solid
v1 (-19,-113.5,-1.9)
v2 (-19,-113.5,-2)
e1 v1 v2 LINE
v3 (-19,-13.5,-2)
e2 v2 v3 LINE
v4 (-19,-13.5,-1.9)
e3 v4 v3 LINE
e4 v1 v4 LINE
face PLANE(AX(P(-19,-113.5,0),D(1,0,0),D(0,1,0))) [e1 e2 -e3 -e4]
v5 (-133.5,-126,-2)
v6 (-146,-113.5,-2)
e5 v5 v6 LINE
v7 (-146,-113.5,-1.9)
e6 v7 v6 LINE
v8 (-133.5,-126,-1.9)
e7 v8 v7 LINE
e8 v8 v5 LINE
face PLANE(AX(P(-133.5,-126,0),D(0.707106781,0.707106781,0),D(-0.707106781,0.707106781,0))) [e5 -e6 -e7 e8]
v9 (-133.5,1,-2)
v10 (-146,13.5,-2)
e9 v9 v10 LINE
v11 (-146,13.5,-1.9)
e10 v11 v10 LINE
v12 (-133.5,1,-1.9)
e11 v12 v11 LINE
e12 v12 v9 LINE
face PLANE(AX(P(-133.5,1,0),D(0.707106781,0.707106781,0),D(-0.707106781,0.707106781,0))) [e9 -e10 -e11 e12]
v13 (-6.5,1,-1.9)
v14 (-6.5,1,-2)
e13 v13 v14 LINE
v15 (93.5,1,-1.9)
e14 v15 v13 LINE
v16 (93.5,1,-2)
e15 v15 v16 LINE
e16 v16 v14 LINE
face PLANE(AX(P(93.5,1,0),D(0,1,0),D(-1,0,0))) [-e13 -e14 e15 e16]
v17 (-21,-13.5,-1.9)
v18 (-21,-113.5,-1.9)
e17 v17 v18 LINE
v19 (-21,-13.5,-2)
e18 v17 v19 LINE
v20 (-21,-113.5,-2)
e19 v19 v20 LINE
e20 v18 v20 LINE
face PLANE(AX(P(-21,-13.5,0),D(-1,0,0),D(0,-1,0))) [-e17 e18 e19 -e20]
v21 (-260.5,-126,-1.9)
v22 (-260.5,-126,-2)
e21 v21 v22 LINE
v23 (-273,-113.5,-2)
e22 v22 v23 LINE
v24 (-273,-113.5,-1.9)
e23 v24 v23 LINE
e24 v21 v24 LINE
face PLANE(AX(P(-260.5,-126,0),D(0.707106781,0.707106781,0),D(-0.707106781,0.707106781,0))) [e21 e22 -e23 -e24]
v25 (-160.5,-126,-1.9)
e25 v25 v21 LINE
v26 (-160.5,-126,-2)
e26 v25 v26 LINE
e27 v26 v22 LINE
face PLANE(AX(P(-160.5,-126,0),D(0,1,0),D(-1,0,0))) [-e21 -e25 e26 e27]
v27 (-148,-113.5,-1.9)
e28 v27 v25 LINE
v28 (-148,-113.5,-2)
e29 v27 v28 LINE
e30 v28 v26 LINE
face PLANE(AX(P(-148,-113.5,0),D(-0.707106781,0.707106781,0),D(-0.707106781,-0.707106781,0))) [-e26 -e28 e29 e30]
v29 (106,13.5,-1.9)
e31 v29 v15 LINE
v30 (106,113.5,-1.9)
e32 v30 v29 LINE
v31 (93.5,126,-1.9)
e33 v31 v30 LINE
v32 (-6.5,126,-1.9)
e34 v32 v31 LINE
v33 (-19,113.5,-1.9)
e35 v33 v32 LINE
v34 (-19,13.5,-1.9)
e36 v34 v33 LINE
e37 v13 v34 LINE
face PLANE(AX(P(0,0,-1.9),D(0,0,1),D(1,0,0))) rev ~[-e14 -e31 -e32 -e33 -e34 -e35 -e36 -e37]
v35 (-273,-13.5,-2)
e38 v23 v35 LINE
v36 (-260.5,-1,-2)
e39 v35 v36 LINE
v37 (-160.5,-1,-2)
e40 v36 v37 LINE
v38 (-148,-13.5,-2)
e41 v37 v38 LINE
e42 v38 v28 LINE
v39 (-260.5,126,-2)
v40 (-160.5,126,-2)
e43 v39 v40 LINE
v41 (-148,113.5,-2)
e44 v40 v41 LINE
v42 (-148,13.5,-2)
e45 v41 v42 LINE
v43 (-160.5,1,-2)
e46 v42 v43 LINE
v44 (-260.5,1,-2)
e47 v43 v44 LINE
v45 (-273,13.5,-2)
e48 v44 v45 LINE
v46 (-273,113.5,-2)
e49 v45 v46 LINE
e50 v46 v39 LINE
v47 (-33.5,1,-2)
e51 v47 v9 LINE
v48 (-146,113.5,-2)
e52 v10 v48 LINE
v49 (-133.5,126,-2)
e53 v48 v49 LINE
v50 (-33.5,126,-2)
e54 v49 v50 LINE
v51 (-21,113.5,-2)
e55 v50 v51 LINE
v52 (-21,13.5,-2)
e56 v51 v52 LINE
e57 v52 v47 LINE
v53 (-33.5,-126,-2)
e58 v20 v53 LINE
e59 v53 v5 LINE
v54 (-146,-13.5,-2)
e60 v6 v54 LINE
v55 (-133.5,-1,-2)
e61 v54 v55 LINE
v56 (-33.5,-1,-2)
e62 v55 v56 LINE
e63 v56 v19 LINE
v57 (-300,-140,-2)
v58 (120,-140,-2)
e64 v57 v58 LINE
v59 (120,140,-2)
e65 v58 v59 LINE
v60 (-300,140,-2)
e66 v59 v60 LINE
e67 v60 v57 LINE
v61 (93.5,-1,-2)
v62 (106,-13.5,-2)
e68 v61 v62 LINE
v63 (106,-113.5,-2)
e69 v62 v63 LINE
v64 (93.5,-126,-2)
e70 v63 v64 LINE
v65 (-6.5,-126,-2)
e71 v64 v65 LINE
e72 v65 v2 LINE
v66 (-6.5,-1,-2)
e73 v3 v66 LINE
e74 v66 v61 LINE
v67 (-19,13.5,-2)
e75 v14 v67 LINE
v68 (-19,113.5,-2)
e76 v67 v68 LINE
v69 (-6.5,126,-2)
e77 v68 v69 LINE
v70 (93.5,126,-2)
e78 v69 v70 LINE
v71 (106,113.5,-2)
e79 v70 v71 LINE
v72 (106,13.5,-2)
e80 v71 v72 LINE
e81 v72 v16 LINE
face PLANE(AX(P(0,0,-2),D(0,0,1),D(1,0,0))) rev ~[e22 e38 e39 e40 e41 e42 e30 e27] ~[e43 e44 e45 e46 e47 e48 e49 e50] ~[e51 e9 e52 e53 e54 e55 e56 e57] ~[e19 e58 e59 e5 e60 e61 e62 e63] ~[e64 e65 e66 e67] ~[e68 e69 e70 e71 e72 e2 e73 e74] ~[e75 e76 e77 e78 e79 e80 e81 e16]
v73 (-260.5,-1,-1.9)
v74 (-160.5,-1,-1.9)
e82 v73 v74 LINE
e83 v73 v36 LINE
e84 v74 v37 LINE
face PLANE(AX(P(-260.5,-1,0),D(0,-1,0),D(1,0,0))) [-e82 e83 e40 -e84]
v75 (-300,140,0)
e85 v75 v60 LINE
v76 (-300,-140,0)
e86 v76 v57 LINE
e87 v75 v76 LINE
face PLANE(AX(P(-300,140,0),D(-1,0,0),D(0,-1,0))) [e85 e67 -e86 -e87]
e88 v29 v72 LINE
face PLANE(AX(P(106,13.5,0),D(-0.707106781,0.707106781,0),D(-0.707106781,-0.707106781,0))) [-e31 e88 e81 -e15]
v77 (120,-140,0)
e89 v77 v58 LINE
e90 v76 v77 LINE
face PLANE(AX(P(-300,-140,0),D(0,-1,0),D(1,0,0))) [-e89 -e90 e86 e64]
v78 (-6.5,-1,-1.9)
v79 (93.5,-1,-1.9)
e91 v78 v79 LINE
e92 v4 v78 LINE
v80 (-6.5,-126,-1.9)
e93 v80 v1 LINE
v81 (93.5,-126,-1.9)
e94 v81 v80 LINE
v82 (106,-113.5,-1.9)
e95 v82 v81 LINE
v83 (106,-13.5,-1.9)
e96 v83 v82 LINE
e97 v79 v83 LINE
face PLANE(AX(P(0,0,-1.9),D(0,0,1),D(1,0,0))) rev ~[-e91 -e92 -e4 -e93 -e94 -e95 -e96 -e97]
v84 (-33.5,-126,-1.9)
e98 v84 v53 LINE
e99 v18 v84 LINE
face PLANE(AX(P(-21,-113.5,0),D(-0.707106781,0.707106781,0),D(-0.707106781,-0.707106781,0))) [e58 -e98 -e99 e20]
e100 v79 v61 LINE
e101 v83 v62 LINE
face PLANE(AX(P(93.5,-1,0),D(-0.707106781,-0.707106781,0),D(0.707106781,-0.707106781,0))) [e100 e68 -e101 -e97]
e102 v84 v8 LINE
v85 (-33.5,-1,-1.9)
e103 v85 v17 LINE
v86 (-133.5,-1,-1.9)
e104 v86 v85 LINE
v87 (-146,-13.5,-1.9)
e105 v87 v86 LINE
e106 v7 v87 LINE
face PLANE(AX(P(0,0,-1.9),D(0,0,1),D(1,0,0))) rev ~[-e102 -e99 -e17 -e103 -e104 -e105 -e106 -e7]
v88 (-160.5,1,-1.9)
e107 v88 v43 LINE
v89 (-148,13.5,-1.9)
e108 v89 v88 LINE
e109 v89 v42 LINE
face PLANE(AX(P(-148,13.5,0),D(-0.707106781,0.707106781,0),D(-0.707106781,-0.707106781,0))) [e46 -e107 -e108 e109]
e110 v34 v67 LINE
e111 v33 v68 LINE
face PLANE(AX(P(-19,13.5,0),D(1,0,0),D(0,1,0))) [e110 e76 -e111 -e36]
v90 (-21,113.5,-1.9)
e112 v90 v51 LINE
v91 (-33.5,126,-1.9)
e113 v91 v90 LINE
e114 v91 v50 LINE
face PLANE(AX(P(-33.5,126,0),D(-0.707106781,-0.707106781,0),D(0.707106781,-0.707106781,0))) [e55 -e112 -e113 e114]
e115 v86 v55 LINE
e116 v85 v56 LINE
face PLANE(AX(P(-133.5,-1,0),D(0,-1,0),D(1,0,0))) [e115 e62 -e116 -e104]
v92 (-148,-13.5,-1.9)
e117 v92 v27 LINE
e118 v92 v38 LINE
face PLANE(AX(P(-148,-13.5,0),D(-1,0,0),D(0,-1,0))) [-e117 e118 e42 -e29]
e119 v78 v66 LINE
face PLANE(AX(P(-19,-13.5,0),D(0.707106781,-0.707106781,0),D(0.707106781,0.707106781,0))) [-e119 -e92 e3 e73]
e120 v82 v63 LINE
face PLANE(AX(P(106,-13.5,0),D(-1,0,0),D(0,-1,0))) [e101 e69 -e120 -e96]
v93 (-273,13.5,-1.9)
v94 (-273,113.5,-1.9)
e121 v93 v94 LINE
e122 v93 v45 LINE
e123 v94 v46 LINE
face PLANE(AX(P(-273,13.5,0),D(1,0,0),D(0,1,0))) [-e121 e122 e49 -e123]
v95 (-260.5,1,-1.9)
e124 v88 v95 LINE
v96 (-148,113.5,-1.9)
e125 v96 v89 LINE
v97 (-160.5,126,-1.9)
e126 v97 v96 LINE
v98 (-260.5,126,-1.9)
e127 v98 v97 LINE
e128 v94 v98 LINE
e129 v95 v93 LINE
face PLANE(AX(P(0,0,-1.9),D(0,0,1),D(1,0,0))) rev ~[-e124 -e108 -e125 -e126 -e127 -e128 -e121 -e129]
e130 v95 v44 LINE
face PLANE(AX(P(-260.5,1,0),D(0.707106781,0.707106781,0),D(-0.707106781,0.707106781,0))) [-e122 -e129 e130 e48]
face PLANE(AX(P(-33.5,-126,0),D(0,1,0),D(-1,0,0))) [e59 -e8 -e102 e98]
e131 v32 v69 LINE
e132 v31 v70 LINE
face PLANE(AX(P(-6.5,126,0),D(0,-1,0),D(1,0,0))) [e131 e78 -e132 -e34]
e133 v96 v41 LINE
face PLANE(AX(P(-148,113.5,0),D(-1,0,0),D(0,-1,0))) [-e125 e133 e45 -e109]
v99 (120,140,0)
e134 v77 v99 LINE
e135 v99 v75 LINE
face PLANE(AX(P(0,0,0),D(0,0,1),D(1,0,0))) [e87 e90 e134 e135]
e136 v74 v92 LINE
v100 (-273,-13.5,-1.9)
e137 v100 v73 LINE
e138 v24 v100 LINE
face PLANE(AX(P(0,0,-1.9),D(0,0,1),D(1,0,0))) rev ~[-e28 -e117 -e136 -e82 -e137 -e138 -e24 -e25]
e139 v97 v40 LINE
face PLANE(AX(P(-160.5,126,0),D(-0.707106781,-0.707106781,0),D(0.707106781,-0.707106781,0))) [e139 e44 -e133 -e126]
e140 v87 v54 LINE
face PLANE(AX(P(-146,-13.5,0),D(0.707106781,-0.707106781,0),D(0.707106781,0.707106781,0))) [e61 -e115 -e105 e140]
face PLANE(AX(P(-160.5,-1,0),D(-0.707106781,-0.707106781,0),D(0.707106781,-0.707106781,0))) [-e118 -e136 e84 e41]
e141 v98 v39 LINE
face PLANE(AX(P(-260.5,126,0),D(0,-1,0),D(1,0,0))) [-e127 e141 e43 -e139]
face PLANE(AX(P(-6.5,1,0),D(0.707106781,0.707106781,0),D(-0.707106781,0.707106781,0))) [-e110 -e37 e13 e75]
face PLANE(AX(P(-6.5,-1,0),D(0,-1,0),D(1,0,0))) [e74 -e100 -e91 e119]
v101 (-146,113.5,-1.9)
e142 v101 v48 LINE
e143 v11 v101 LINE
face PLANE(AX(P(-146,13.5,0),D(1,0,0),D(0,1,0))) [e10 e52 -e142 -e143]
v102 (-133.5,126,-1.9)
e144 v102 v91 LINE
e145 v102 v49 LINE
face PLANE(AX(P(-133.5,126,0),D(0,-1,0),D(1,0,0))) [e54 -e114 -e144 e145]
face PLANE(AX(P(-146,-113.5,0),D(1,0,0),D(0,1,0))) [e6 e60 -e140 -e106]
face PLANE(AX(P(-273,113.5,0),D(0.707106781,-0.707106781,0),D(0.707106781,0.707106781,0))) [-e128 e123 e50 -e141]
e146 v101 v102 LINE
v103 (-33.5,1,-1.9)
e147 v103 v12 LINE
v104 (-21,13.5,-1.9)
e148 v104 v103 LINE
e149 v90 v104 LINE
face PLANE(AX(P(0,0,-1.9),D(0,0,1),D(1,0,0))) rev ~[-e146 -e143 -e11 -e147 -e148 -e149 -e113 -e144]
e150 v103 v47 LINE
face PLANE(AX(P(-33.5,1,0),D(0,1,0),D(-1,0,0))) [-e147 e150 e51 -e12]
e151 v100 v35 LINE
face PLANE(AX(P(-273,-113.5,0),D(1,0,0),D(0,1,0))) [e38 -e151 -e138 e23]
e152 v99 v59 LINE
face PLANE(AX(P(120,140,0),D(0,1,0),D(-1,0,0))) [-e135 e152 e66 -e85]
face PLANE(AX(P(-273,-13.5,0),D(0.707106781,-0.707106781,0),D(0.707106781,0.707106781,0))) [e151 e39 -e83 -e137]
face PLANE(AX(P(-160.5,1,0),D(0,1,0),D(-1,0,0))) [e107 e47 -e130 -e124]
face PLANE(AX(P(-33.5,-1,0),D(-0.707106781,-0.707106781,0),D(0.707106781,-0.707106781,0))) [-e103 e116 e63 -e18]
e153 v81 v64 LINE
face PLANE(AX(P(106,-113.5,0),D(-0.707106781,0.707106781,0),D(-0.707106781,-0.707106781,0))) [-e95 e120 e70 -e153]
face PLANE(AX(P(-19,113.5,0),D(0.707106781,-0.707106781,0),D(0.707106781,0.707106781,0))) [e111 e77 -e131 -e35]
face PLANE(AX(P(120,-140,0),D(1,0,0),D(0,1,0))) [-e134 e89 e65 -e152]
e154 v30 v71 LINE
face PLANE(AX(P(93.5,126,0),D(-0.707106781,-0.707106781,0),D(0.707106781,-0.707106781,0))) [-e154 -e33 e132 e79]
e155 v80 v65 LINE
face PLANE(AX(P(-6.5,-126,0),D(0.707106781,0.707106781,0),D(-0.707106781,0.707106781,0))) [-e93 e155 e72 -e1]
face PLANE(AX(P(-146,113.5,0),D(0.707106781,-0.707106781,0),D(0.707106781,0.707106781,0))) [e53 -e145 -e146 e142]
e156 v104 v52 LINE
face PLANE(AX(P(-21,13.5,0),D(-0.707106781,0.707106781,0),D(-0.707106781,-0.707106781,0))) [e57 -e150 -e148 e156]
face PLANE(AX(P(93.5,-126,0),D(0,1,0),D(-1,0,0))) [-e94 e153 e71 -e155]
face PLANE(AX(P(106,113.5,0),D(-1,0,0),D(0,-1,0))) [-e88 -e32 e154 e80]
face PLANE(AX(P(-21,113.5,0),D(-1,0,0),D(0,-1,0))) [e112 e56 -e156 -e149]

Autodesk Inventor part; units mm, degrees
ref_plane "YZ Plane" through (0, 0, 0) normal (1, 0, 0) x (0, 1, 0)
ref_plane "XZ Plane" through (0, 0, 0) normal (0, 1, 0) x (-1, 0, 0)
ref_plane "XY Plane" through (0, 0, 0) normal (0, 0, 1) x (1, 0, 0)
sketch "Sketch1" plane through (0, 0, 0) normal (0, 0, 1) x (1, 0, 0)
  line L0 (-300, -140) -> (120, -140)
  line L1 (120, -140) -> (120, 140)
  line L2 (120, 140) -> (-300, 140)
  line L3 (-300, 140) -> (-300, -140)
  point P0 (0, 0)
  dimension "d0" = 420
  dimension "d1" = 280
  dimension "d36" = 300
sketch "Sketch4" plane through (0, 0, 0) normal (0, 0, 1) x (1, 0, 0)
  line L0 (-273, -1) -> (-260.5, -1)
  line L1 (-148, -1) -> (-148, -13.5)
  line L2 (-148, -126) -> (-160.5, -126)
  line L3 (-273, -126) -> (-273, -113.5)
  line L4 (-273, -13.5) -> (-260.5, -1)
  line L5 (-160.5, -1) -> (-148, -13.5)
  line L6 (-148, -113.5) -> (-160.5, -126)
  line L7 (-260.5, -126) -> (-273, -113.5)
  line L8 (-260.5, -1) -> (-160.5, -1)
  line L9 (-273, -13.5) -> (-273, -1)
  line L10 (-160.5, -1) -> (-148, -1)
  line L11 (-148, -13.5) -> (-148, -113.5)
  line L12 (-160.5, -126) -> (-260.5, -126)
  line L13 (-148, -113.5) -> (-148, -126)
  line L14 (-260.5, -126) -> (-273, -126)
  line L15 (-273, -113.5) -> (-273, -13.5)
  line L16 (-300, -140) -> (120, -140) projected
  line L17 (-300, 140) -> (-300, -140) projected
  point P0 (0, 0)
  dimension "d6" = 125
  dimension "d7" = 125
  dimension "d8" = 12.5
  dimension "d9" = 12.5
  dimension "d10" = 12.5
  dimension "d11" = 12.5
  dimension "d12" = 12.5
  dimension "d13" = 12.5
  dimension "d14" = 12.5
  dimension "d15" = 12.5
  dimension "d22" = 14
  dimension "d23" = 27
sketch "Sketch5" plane through (0, 0, 0) normal (0, 0, 1) x (1, 0, 0)
  line L0 (-273, -13.5) -> (-260.5, -1) projected
  line L1 (-260.5, -1) -> (-160.5, -1) projected
  line L2 (-160.5, -1) -> (-148, -13.5) projected
  line L3 (-148, -13.5) -> (-148, -113.5) projected
  line L4 (-160.5, -126) -> (-260.5, -126) projected
  line L5 (-148, -113.5) -> (-160.5, -126) projected
  line L6 (-260.5, -126) -> (-273, -113.5) projected
  line L7 (-273, -113.5) -> (-273, -13.5) projected
  point P0 (0, 0)
boundary_patch "Boundary Patch3"
pattern_linear "Rectangular Pattern1" count 3 spacing 127 along (1, 0, 0) count 2 spacing 127 along (0, 1, 0) of "Boundary Patch3"
sketch "Sketch6" plane through (0, 0, 0) normal (0, 0, 1) x (1, 0, 0)
  line L0 (120, 140) -> (-300, 140) projected
  line L1 (-300, 140) -> (-300, -140) projected
  line L2 (-300, -140) -> (120, -140) projected
  line L3 (120, -140) -> (120, 140) projected
  line L4 (-260.5, 126) -> (-160.5, 126) projected
  line L5 (-133.5, 126) -> (-33.5, 126) projected
  line L6 (-146, 113.5) -> (-133.5, 126) projected
  line L7 (-160.5, 126) -> (-148, 113.5) projected
  line L8 (-273, 13.5) -> (-273, 113.5) projected
  line L9 (-273, 113.5) -> (-260.5, 126) projected
  line L10 (-260.5, 1) -> (-273, 13.5) projected
  line L11 (-160.5, 1) -> (-260.5, 1) projected
  line L12 (-148, 113.5) -> (-148, 13.5) projected
  line L13 (-148, 13.5) -> (-160.5, 1) projected
  line L14 (-133.5, 1) -> (-146, 13.5) projected
  line L15 (-146, 13.5) -> (-146, 113.5) projected
  line L16 (-21, 113.5) -> (-21, 13.5) projected
  line L17 (-19, 13.5) -> (-19, 113.5) projected
  line L18 (-33.5, 126) -> (-21, 113.5) projected
  line L19 (-19, 113.5) -> (-6.5, 126) projected
  line L20 (-6.5, 126) -> (93.5, 126) projected
  line L21 (93.5, 126) -> (106, 113.5) projected
  line L22 (106, 113.5) -> (106, 13.5) projected
  line L23 (-273, -113.5) -> (-273, -13.5) projected
  line L24 (-273, -13.5) -> (-260.5, -1) projected
  line L25 (-160.5, -1) -> (-148, -13.5) projected
  line L26 (-260.5, -1) -> (-160.5, -1) projected
  line L27 (-146, -13.5) -> (-133.5, -1) projected
  line L28 (-33.5, -1) -> (-21, -13.5) projected
  line L29 (-133.5, -1) -> (-33.5, -1) projected
  line L30 (-33.5, 1) -> (-133.5, 1) projected
  line L31 (-21, 13.5) -> (-33.5, 1) projected
  line L32 (106, 13.5) -> (93.5, 1) projected
  line L33 (-6.5, 1) -> (-19, 13.5) projected
  line L34 (93.5, 1) -> (-6.5, 1) projected
  line L35 (-6.5, -1) -> (93.5, -1) projected
  line L36 (-19, -13.5) -> (-6.5, -1) projected
  line L37 (93.5, -1) -> (106, -13.5) projected
  line L38 (-160.5, -126) -> (-260.5, -126) projected
  line L39 (-148, -13.5) -> (-148, -113.5) projected
  line L40 (-146, -113.5) -> (-146, -13.5) projected
  line L41 (-21, -13.5) -> (-21, -113.5) projected
  line L42 (-19, -113.5) -> (-19, -13.5) projected
  line L43 (106, -13.5) -> (106, -113.5) projected
  line L44 (106, -113.5) -> (93.5, -126) projected
  line L45 (93.5, -126) -> (-6.5, -126) projected
  line L46 (-6.5, -126) -> (-19, -113.5) projected
  line L47 (-21, -113.5) -> (-33.5, -126) projected
  line L48 (-33.5, -126) -> (-133.5, -126) projected
  line L49 (-133.5, -126) -> (-146, -113.5) projected
  line L50 (-148, -113.5) -> (-160.5, -126) projected
  line L51 (-260.5, -126) -> (-273, -113.5) projected
  point P0 (0, 0)
sketch "Sketch9" plane through (0, 0, 0) normal (0, 0, 1) x (1, 0, 0)
  line L0 (-260.5, 126) -> (-160.5, 126) projected
  line L1 (-160.5, 126) -> (-148, 113.5) projected
  line L2 (-148, 113.5) -> (-148, 13.5) projected
  line L3 (-273, 13.5) -> (-273, 113.5) projected
  line L4 (-273, 113.5) -> (-260.5, 126) projected
  line L5 (-160.5, 1) -> (-260.5, 1) projected
  line L6 (-260.5, 1) -> (-273, 13.5) projected
  line L7 (-273, -13.5) -> (-260.5, -1) projected
  line L8 (-260.5, -1) -> (-160.5, -1) projected
  line L9 (-273, -113.5) -> (-273, -13.5) projected
  line L10 (-160.5, -1) -> (-148, -13.5) projected
  line L11 (-148, -13.5) -> (-148, -113.5) projected
  line L12 (-148, 13.5) -> (-160.5, 1) projected
  line L13 (-133.5, 1) -> (-146, 13.5) projected
  line L14 (-146, -13.5) -> (-133.5, -1) projected
  line L15 (-146, -113.5) -> (-146, -13.5) projected
  line L16 (-146, 13.5) -> (-146, 113.5) projected
  line L17 (-133.5, 126) -> (-33.5, 126) projected
  line L18 (-146, 113.5) -> (-133.5, 126) projected
  line L19 (-33.5, 126) -> (-21, 113.5) projected
  line L20 (-21, 113.5) -> (-21, 13.5) projected
  line L21 (-21, 13.5) -> (-33.5, 1) projected
  line L22 (-33.5, 1) -> (-133.5, 1) projected
  line L23 (-133.5, -1) -> (-33.5, -1) projected
  line L24 (-33.5, -126) -> (-133.5, -126) projected
  line L25 (-160.5, -126) -> (-260.5, -126) projected
  line L26 (-260.5, -126) -> (-273, -113.5) projected
  line L27 (-148, -113.5) -> (-160.5, -126) projected
  line L28 (-21, -113.5) -> (-33.5, -126) projected
  line L29 (-133.5, -126) -> (-146, -113.5) projected
  line L30 (-33.5, -1) -> (-21, -13.5) projected
  line L31 (-6.5, 1) -> (-19, 13.5) projected
  line L32 (106, 13.5) -> (93.5, 1) projected
  line L33 (93.5, -1) -> (106, -13.5) projected
  line L34 (106, 113.5) -> (106, 13.5) projected
  line L35 (93.5, 1) -> (-6.5, 1) projected
  line L36 (-6.5, -1) -> (93.5, -1) projected
  line L37 (93.5, -126) -> (-6.5, -126) projected
  line L38 (-19, -113.5) -> (-19, -13.5) projected
  line L39 (-21, -13.5) -> (-21, -113.5) projected
  line L40 (106, -13.5) -> (106, -113.5) projected
  line L41 (-19, -13.5) -> (-6.5, -1) projected
  line L42 (-19, 13.5) -> (-19, 113.5) projected
  line L43 (-6.5, 126) -> (93.5, 126) projected
  line L44 (-19, 113.5) -> (-6.5, 126) projected
  line L45 (93.5, 126) -> (106, 113.5) projected
  line L46 (106, -113.5) -> (93.5, -126) projected
  line L47 (-6.5, -126) -> (-19, -113.5) projected
extrude "Extrusion4" add sketch "Sketch6" against normal blind 2
extrude "Extrusion6" add sketch "Sketch9" against normal blind 1.9
equation "\"d9\" = d8"
equation "\"d10\" = d9"
equation "\"d11\" = d10"
equation "\"d12\" = d11"
equation "\"d13\" = d12"
equation "\"d14\" = d13"
equation "\"d15\" = d8"
properties part number "solar1" material "Aluminum 6061-AHC"
